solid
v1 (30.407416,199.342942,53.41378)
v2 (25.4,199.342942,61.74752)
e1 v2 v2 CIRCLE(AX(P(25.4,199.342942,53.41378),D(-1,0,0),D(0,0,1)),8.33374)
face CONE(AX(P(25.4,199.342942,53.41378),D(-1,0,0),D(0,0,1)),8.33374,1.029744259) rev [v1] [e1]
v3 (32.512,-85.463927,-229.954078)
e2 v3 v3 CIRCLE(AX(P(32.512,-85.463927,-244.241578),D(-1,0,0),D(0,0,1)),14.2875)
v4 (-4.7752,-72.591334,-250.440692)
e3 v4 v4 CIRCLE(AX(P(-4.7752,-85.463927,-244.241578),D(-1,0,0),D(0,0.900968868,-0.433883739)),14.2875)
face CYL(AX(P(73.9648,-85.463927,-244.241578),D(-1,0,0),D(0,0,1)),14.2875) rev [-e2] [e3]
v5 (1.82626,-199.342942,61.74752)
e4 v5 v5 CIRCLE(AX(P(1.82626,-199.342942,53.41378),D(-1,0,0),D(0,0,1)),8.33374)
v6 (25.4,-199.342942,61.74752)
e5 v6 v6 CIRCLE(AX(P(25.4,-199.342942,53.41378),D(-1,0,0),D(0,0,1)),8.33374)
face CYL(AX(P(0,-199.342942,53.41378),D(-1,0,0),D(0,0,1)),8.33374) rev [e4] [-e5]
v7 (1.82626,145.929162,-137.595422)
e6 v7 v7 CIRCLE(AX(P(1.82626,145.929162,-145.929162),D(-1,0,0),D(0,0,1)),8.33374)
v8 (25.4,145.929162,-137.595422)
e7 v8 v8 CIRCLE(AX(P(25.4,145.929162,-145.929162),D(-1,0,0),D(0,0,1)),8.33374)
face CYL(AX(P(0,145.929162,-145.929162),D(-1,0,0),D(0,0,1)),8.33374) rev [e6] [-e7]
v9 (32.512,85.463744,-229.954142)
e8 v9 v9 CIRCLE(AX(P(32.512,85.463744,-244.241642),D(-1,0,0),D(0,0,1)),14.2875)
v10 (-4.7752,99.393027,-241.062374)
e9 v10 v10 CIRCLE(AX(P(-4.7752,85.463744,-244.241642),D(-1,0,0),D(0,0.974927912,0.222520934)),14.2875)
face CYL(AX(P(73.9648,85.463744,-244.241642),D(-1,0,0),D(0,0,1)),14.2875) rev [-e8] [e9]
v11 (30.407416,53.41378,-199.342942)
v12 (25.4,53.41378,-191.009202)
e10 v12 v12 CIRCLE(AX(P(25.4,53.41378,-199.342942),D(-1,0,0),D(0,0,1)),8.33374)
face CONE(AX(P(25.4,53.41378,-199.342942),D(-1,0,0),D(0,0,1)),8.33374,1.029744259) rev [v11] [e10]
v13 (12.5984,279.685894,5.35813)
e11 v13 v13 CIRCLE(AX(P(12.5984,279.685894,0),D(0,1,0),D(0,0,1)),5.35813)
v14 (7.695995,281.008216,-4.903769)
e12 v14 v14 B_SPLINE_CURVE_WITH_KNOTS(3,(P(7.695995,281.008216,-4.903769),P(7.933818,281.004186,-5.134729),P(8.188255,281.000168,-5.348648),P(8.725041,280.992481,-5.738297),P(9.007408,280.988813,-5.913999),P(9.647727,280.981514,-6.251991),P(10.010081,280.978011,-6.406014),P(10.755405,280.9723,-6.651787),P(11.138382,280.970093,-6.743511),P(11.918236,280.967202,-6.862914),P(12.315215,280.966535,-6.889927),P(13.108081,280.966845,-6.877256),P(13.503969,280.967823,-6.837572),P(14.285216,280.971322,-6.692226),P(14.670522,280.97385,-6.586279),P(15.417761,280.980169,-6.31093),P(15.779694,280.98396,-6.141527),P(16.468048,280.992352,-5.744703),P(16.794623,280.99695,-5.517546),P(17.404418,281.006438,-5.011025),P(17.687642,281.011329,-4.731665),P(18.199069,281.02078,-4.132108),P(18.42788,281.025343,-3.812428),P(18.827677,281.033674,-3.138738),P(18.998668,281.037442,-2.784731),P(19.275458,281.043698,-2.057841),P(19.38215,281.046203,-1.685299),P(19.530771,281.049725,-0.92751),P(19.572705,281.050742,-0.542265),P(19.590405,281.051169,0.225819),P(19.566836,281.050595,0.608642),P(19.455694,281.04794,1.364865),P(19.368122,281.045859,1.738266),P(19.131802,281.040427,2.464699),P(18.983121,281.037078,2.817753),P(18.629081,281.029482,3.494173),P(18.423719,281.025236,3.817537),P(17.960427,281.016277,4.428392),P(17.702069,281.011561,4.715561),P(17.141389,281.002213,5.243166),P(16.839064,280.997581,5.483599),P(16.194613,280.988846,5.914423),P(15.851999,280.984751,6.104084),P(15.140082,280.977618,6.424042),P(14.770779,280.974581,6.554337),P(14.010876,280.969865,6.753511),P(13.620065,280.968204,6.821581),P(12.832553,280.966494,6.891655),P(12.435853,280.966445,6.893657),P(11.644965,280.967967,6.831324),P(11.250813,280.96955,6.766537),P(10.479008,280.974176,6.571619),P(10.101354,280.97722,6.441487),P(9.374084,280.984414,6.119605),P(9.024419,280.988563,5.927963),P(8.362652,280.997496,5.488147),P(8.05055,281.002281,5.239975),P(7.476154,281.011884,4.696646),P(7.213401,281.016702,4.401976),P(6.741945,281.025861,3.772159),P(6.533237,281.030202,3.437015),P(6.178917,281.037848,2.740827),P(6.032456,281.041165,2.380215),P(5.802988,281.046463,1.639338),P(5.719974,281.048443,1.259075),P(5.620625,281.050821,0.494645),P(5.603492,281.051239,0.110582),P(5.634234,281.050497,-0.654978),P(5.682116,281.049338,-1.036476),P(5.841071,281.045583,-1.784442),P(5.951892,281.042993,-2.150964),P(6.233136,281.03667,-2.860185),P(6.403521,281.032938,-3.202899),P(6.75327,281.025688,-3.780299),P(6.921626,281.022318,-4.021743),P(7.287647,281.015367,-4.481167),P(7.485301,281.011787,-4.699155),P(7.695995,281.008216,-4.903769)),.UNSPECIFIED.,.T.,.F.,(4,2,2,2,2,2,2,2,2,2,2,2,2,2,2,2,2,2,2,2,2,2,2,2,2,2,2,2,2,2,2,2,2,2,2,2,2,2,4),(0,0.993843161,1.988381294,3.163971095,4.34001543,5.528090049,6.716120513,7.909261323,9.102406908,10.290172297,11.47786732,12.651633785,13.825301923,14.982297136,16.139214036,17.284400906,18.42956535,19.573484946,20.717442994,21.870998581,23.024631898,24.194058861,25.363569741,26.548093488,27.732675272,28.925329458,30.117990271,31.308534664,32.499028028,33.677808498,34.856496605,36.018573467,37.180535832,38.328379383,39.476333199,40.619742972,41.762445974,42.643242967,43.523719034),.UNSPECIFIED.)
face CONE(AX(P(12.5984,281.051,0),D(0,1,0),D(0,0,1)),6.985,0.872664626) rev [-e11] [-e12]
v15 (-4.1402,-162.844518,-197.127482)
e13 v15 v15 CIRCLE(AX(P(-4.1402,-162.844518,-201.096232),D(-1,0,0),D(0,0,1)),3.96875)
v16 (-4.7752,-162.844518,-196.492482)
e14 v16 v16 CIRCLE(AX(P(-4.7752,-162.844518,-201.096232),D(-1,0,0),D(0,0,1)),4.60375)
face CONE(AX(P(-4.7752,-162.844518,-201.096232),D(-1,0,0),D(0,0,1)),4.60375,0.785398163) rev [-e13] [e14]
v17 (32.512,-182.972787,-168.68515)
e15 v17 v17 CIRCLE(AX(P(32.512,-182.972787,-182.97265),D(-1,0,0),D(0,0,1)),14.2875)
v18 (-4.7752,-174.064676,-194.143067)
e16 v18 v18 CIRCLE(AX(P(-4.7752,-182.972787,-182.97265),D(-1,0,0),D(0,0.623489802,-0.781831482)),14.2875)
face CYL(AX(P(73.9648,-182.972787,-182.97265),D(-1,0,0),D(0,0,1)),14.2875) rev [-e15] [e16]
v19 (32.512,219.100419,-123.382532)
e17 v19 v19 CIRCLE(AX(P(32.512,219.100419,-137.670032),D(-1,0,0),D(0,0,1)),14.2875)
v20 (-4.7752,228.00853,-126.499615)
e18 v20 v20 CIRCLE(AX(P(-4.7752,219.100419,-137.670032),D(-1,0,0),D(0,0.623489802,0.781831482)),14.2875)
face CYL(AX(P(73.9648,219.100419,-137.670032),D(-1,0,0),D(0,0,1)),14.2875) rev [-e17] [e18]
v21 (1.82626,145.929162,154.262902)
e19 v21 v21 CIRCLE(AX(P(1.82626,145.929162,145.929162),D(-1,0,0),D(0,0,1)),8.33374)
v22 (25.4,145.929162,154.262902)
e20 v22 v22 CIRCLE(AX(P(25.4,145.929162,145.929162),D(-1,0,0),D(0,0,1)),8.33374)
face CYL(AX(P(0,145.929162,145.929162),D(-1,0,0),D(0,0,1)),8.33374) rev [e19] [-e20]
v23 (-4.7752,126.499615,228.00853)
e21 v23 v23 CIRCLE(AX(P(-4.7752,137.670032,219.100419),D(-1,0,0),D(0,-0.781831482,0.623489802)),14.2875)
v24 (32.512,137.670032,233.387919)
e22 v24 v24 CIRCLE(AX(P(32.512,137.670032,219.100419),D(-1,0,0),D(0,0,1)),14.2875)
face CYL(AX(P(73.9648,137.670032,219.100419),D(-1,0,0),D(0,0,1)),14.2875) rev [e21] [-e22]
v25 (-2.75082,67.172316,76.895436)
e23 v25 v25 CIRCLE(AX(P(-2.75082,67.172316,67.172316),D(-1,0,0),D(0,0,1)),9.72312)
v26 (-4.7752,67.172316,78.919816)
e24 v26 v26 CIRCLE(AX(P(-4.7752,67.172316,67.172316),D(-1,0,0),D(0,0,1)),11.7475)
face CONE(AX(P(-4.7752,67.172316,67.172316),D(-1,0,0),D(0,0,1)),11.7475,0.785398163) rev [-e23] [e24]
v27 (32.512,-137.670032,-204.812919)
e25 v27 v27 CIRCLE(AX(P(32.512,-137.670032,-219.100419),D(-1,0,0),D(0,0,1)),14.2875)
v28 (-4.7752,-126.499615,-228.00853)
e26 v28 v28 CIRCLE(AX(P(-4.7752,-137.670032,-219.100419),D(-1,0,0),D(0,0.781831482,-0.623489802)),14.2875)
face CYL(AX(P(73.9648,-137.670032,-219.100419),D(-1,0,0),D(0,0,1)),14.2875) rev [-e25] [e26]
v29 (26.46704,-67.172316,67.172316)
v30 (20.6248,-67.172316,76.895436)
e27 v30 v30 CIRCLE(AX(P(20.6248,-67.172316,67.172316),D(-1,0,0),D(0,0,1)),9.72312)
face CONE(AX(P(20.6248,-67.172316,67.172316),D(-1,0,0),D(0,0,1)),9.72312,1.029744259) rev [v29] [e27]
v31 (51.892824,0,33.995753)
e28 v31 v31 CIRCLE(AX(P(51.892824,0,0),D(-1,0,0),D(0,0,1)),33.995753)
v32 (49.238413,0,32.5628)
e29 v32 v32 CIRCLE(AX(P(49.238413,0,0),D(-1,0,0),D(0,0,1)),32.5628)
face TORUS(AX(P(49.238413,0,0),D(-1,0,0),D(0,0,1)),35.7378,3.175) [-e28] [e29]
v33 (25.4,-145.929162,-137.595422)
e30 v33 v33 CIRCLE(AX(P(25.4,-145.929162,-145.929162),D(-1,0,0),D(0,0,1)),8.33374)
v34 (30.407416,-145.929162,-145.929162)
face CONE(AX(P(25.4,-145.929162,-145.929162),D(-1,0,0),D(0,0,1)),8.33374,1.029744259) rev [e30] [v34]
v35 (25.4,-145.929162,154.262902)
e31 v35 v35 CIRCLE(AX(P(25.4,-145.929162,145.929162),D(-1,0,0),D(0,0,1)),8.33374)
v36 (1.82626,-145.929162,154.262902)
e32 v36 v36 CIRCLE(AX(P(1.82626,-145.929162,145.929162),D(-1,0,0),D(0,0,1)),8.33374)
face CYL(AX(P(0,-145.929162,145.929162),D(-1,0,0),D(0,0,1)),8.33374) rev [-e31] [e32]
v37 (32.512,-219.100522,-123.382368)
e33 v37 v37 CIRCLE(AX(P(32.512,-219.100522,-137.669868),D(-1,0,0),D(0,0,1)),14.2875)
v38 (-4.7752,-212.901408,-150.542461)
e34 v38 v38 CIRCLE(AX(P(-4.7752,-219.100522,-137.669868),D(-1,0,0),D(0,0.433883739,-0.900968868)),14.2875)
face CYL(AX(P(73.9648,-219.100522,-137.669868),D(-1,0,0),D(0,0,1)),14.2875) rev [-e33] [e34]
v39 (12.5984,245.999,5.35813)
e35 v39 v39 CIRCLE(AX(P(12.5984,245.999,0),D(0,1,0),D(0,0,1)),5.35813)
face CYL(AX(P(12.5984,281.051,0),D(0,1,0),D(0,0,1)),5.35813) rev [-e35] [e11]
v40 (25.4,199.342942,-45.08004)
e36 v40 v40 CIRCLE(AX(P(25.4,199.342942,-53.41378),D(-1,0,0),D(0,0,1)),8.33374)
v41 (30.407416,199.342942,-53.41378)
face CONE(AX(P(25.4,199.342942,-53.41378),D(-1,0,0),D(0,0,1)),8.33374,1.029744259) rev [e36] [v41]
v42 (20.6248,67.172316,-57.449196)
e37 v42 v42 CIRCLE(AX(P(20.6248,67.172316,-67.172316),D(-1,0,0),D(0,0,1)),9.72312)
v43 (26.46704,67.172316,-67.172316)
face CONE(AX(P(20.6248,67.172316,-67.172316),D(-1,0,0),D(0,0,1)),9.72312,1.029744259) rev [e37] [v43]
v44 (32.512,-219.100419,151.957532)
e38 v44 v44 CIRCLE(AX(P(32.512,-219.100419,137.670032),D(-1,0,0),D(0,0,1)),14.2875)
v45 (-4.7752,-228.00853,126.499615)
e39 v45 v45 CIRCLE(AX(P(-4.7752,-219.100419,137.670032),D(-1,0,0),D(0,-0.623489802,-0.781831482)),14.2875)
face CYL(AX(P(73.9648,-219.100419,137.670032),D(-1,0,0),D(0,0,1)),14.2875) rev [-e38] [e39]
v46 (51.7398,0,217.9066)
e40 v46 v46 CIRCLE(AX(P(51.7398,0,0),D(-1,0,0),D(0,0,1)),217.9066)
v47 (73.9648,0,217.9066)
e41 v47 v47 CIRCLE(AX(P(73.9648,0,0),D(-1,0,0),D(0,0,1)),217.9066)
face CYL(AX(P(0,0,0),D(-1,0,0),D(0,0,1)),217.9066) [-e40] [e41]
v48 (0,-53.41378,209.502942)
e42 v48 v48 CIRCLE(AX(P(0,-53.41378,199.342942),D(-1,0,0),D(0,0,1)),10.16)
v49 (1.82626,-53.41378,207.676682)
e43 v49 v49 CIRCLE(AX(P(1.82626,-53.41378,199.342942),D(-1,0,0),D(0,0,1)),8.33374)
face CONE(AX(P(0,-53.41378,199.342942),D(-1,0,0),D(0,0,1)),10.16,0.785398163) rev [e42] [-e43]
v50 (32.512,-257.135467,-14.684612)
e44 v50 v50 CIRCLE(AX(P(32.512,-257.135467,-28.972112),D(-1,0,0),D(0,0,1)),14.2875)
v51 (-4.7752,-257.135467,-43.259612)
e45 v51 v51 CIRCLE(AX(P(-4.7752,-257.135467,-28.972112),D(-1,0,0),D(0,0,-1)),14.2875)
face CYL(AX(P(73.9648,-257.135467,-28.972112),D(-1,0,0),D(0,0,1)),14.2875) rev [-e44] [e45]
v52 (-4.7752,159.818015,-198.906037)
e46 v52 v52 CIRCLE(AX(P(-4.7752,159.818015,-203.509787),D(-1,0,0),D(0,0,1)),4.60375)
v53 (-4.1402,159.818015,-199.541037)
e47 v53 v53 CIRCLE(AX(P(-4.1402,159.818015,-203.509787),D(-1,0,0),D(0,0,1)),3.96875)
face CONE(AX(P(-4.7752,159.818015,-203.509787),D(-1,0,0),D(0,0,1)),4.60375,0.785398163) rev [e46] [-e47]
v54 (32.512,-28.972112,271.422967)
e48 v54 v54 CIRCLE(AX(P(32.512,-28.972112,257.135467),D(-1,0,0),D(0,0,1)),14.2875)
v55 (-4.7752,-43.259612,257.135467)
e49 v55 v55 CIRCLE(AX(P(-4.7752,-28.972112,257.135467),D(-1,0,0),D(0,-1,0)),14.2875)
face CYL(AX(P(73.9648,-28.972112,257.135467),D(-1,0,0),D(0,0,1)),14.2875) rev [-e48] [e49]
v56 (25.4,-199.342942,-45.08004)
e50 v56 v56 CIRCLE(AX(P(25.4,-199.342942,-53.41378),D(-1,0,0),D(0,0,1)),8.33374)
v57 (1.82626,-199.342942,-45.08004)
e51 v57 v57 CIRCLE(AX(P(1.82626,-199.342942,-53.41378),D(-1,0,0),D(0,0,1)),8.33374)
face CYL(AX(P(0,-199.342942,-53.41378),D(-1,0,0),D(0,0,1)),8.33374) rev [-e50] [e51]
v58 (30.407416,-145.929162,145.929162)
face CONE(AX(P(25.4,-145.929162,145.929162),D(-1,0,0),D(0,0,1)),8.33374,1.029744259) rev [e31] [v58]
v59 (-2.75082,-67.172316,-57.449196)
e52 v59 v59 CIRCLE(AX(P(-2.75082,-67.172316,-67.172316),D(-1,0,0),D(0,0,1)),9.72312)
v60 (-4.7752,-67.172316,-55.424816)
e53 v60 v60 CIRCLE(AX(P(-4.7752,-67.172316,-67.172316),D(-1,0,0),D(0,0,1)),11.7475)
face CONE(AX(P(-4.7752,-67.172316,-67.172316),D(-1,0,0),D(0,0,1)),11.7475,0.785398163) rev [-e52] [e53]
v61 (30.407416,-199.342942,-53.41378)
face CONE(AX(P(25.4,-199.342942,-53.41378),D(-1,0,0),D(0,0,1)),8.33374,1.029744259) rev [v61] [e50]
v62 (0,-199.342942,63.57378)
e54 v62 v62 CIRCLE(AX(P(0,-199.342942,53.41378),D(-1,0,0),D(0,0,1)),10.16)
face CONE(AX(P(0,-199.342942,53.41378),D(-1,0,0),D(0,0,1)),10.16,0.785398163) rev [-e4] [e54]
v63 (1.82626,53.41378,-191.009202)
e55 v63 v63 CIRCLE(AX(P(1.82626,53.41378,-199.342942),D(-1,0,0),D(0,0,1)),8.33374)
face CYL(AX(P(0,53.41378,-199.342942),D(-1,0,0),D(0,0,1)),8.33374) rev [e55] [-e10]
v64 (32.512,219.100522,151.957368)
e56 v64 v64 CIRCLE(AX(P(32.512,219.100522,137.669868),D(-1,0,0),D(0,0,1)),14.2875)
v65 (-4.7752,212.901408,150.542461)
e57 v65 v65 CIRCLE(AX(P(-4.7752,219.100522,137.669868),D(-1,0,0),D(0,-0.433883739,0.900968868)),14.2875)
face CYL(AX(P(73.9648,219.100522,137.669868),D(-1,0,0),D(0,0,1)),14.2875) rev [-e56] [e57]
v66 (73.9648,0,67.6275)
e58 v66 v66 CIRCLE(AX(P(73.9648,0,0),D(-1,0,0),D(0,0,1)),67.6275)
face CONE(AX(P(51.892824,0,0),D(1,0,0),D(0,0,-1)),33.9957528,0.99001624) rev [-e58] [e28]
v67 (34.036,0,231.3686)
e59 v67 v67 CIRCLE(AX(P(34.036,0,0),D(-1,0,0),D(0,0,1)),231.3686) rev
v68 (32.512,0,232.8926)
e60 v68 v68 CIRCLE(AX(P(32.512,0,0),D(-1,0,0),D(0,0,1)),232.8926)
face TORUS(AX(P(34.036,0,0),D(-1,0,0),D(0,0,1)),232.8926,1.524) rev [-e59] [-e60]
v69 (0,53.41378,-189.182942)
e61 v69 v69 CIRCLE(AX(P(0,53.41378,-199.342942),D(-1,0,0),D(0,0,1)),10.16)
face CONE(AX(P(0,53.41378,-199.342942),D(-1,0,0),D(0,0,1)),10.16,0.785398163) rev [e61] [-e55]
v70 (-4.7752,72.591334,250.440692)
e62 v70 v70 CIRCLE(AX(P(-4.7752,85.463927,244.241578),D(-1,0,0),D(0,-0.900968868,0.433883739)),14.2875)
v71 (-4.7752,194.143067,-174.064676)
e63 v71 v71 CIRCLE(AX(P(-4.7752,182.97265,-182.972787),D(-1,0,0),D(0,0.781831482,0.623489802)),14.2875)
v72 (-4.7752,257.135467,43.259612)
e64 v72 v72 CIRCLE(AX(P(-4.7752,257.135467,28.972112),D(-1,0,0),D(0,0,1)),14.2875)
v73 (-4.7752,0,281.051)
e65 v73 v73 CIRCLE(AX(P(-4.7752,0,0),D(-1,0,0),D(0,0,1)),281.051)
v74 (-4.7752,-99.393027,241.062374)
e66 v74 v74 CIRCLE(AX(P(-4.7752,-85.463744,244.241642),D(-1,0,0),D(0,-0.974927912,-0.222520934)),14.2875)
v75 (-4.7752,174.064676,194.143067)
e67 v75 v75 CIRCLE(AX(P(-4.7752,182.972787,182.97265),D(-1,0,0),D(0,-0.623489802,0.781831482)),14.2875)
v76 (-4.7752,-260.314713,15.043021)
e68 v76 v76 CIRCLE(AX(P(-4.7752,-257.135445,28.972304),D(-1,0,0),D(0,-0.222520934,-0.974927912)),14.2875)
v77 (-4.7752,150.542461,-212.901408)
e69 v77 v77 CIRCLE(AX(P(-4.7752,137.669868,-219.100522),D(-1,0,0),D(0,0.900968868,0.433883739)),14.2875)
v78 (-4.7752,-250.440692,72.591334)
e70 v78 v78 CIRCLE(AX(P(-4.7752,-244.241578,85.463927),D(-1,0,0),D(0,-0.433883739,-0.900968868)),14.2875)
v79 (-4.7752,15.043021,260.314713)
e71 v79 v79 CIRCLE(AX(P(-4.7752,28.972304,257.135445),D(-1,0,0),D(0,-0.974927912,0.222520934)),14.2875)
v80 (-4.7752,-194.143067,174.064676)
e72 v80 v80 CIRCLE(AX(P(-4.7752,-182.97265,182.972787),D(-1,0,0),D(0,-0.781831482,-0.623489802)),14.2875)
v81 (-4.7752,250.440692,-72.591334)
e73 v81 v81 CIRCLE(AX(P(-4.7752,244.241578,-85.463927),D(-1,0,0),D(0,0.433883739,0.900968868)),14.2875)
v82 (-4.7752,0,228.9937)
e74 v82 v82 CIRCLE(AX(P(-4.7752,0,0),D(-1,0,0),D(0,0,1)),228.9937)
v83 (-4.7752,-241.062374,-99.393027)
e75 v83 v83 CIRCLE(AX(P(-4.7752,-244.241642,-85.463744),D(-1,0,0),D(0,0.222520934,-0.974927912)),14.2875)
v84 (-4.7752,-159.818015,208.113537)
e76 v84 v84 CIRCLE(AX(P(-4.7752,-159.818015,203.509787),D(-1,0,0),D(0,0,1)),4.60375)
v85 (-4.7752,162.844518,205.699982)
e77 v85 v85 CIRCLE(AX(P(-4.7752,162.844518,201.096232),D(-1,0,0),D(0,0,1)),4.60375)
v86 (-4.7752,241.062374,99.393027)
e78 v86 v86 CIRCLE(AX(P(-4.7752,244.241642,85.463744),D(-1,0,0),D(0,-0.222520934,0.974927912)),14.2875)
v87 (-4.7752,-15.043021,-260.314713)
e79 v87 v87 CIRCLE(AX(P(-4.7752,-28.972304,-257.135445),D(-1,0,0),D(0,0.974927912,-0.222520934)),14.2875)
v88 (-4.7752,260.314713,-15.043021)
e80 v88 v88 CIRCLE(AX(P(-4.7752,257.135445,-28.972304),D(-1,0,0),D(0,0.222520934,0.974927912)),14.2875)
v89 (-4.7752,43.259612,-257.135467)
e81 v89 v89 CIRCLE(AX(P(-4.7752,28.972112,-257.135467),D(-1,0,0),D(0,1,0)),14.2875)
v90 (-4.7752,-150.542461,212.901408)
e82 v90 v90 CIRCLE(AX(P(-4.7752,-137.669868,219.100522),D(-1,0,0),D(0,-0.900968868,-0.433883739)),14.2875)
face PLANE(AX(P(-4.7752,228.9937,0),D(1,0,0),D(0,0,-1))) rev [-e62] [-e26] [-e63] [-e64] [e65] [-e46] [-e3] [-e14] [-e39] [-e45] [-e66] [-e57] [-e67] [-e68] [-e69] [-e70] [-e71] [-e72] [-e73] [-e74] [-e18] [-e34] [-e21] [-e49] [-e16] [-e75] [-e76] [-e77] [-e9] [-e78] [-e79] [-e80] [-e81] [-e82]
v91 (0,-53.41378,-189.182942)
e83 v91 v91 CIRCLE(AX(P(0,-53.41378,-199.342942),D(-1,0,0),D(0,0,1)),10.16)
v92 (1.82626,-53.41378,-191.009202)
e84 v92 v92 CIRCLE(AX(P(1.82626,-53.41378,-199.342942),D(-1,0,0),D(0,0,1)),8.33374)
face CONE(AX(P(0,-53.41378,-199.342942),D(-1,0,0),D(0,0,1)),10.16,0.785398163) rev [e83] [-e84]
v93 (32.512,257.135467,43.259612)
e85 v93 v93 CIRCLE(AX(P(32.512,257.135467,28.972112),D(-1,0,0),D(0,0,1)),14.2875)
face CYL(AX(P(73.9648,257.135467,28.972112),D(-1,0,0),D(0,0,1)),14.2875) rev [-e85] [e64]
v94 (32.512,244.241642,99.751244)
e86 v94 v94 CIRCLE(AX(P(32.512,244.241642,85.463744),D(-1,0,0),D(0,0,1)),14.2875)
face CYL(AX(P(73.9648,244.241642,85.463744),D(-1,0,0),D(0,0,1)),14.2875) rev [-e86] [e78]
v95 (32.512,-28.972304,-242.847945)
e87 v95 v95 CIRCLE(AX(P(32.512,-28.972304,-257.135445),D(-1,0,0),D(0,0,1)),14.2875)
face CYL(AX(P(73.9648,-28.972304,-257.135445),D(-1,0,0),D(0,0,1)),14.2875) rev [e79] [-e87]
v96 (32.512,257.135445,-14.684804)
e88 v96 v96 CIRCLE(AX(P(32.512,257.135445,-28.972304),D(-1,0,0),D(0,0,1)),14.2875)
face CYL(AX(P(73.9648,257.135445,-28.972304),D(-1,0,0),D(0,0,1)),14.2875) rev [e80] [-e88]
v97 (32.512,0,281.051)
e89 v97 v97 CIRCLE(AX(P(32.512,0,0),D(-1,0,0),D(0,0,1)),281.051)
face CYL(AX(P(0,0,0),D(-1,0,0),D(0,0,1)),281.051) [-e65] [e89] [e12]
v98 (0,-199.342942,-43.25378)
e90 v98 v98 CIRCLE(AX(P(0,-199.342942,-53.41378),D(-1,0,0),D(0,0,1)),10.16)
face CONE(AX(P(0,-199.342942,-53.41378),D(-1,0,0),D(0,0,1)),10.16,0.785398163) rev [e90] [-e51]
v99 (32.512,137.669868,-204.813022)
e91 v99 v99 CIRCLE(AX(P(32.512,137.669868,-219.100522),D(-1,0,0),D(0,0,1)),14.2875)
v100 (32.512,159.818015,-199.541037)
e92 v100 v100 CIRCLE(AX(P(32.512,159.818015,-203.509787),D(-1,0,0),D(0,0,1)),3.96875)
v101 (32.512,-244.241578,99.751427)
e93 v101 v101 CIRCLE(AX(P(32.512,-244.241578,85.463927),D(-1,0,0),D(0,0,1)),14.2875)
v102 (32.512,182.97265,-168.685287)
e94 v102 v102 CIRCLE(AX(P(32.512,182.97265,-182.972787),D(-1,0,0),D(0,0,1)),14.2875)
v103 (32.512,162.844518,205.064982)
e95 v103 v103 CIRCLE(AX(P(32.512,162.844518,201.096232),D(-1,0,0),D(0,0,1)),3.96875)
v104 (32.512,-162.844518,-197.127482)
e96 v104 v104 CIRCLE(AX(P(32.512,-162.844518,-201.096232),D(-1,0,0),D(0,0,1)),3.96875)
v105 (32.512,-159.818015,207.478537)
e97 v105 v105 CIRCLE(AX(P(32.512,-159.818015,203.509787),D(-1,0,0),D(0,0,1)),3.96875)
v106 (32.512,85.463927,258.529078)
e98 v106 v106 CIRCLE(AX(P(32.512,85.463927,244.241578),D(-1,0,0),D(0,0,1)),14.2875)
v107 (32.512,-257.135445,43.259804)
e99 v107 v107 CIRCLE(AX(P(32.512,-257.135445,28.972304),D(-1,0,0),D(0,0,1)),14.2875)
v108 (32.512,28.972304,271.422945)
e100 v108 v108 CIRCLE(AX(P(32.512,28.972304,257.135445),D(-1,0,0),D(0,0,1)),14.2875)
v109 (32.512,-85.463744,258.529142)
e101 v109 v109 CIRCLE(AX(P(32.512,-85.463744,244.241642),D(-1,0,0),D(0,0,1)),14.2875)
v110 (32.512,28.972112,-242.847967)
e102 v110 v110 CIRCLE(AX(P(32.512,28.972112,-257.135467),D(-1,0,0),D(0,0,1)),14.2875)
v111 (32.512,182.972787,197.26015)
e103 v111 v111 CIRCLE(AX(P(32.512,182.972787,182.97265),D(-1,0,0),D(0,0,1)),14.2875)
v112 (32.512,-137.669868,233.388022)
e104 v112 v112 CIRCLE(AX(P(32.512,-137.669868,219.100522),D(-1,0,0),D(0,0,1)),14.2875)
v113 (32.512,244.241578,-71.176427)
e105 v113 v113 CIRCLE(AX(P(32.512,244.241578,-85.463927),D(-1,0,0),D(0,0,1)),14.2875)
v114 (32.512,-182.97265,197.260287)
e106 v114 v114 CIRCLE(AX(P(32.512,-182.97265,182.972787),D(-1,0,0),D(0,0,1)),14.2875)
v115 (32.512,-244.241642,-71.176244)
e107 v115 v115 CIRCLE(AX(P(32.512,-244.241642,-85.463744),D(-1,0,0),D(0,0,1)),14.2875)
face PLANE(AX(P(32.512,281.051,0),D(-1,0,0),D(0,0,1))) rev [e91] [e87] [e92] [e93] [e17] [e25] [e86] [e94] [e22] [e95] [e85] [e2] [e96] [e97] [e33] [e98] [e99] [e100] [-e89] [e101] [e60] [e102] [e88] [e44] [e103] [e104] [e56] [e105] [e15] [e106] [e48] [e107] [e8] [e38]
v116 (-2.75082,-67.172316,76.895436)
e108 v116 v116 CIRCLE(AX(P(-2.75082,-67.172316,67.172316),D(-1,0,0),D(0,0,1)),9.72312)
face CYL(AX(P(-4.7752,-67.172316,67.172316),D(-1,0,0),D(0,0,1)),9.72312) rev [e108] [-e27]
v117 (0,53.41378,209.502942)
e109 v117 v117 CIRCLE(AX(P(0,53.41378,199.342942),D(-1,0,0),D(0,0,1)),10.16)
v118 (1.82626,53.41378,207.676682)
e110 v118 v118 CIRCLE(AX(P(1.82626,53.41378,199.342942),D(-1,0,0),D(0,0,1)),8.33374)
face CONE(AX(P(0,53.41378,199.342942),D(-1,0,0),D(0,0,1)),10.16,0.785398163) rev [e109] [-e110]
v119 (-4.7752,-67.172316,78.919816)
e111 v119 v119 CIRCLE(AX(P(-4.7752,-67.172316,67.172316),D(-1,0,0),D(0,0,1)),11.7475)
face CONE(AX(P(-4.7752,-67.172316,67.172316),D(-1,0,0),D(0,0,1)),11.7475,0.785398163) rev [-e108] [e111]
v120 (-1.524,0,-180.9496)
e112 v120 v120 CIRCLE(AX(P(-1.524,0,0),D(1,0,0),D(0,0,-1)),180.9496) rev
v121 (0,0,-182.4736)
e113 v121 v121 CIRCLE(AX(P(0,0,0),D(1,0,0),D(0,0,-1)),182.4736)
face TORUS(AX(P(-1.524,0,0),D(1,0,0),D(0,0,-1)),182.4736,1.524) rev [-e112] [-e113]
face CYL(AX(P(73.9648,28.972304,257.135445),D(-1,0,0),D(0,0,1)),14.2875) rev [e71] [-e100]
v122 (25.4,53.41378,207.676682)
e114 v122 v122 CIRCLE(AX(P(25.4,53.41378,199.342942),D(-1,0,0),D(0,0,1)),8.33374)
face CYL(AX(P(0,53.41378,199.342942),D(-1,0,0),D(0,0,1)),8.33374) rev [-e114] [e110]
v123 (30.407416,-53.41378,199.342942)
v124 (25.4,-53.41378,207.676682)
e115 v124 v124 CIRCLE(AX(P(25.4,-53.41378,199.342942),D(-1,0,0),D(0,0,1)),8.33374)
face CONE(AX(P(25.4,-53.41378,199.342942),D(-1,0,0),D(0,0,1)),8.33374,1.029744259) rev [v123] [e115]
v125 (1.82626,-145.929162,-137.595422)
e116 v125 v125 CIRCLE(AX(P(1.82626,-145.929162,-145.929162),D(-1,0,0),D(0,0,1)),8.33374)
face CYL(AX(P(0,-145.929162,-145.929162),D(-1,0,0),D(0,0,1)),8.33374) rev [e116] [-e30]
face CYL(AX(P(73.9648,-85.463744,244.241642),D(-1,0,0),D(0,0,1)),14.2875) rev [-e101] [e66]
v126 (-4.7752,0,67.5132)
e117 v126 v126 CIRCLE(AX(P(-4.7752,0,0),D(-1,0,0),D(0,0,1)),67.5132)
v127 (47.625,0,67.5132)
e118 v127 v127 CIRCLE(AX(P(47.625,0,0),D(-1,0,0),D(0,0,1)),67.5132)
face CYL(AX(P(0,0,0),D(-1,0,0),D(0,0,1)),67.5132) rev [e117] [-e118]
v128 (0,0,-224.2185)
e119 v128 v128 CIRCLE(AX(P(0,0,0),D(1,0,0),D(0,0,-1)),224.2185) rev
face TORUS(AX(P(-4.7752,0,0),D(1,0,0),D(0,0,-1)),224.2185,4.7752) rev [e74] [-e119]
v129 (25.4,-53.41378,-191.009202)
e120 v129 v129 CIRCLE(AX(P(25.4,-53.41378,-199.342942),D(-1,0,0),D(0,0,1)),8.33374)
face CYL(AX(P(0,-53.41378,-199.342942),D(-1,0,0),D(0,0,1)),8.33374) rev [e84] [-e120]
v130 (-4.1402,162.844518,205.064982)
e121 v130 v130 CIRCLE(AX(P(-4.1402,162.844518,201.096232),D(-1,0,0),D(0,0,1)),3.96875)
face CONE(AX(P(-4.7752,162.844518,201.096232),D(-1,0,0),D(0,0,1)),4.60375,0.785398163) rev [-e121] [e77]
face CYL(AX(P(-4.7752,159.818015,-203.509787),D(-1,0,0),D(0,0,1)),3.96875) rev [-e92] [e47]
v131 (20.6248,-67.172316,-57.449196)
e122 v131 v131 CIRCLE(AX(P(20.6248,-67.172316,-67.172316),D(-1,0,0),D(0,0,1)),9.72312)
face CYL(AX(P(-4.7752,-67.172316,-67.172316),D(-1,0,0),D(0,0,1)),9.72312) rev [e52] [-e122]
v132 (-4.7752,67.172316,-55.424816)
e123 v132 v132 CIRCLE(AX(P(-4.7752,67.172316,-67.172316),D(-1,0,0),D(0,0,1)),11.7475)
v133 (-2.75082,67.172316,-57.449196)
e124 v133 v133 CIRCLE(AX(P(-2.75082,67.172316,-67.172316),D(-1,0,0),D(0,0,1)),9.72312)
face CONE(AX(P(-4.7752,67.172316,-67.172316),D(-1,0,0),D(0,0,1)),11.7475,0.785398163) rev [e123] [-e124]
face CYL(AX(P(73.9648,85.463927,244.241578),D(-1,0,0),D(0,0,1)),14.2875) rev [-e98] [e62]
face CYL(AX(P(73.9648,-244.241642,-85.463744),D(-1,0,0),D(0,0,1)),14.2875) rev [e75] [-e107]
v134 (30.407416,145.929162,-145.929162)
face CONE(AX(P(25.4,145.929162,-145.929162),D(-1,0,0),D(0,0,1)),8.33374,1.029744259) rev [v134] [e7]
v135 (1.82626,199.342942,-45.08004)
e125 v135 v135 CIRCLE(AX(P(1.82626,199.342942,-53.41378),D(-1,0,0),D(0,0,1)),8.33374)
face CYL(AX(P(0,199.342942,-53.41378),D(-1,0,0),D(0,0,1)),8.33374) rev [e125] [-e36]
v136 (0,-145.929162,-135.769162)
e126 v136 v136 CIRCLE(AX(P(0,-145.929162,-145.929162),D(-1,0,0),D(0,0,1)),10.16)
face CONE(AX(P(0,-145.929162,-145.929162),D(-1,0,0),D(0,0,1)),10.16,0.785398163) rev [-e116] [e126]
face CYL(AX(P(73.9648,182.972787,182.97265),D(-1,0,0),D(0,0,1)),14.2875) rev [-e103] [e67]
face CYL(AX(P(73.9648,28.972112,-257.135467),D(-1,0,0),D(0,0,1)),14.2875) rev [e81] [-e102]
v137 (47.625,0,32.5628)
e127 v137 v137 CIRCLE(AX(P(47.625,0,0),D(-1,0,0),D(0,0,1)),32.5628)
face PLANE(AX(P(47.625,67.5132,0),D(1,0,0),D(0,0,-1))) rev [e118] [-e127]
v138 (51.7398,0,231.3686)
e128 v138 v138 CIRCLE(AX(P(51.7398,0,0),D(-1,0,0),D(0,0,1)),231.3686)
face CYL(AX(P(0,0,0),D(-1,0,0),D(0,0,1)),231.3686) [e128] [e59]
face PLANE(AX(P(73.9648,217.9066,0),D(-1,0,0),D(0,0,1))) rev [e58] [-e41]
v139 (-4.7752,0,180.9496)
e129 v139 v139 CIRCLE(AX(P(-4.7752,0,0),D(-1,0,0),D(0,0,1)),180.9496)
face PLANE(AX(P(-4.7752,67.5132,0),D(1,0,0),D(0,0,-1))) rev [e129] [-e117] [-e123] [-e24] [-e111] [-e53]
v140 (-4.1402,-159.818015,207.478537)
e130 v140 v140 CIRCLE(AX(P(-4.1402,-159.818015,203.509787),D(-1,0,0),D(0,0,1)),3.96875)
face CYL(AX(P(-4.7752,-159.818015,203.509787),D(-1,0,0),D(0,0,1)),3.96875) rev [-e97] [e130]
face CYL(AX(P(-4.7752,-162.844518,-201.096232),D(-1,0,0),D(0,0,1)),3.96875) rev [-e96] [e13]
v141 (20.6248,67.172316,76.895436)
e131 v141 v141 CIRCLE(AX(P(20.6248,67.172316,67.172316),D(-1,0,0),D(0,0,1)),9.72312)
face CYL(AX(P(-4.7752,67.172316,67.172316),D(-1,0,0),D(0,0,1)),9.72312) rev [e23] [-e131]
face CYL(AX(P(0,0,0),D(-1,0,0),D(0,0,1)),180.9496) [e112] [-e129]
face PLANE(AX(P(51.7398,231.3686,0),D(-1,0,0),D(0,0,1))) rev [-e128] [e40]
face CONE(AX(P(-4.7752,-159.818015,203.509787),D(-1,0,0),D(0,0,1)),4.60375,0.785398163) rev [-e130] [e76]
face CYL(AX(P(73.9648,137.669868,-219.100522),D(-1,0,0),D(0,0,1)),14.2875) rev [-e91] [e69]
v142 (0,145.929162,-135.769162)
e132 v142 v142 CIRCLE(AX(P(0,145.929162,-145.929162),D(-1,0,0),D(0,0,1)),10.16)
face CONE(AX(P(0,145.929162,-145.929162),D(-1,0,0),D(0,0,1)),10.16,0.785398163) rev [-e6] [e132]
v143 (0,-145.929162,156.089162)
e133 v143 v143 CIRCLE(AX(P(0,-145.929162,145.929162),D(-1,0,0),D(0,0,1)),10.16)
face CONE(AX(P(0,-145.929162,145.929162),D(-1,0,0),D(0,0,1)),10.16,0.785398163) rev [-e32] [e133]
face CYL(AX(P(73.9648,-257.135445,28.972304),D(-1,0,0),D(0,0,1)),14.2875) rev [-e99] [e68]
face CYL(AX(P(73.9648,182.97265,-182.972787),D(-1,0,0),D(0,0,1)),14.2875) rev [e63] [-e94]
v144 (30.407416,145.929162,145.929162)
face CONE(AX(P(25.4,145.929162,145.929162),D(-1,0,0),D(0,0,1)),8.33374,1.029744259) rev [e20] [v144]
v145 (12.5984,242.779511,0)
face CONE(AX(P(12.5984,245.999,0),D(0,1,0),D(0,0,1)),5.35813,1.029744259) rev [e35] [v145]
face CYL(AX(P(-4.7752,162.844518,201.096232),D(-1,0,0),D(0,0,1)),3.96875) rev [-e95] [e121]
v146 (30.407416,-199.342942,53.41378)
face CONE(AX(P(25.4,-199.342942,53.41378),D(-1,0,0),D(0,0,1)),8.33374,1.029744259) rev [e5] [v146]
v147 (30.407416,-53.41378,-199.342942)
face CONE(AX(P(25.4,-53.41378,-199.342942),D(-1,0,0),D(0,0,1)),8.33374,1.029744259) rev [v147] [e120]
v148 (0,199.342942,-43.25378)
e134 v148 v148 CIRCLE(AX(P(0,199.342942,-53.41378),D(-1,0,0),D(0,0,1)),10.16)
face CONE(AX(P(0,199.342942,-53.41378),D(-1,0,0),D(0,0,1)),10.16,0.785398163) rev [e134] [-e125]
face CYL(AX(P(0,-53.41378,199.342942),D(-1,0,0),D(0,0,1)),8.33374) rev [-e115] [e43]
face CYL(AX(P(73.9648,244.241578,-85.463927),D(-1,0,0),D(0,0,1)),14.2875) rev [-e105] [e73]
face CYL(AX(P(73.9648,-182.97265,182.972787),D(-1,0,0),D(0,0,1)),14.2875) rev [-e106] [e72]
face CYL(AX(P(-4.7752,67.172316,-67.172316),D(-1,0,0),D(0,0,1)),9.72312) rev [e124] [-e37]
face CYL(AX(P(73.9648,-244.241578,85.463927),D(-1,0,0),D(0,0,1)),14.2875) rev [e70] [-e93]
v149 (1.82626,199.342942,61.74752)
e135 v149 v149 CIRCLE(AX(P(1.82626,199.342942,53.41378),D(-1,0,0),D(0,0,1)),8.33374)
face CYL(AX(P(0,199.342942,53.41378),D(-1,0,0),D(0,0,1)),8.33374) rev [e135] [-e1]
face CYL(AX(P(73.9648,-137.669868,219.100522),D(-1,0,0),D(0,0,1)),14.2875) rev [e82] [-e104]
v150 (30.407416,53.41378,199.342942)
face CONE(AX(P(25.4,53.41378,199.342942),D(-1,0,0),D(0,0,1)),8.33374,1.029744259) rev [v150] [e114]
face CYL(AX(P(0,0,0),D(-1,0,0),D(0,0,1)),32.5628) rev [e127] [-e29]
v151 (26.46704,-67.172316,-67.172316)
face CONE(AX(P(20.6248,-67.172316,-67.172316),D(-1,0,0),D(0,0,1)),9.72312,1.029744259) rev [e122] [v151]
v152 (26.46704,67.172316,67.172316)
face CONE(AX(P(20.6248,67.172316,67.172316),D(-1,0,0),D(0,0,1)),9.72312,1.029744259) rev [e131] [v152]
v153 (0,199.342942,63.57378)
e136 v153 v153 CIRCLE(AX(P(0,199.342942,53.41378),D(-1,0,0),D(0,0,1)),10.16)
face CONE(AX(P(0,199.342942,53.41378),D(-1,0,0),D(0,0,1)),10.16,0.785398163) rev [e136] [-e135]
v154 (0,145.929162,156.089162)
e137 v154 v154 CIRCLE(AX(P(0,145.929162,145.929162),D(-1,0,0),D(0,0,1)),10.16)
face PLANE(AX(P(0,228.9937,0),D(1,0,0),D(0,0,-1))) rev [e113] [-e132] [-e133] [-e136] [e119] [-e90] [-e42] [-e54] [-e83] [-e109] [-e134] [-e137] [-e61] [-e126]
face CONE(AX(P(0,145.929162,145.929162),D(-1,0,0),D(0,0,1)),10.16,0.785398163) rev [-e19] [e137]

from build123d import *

# Parameters (mm, degrees)
SKETCH4_R                         = 14.2875
CUT_EXTRUDE1_DEPTH                = 406.190469782
CIRPATTERN2_COUNT                 = 28
CIRPATTERN3_COUNT                 = 12
CIRPATTERN4_COUNT                 = 4
CIRPATTERN5_COUNT                 = 56
F_1_2_13_TAPPED_HOLE4_D           = 10.71626
F_1_2_13_TAPPED_HOLE4_DEPTH       = 35.052
F_1_2_13_TAPPED_HOLE4_CSINK_D     = 13.97
F_1_2_13_TAPPED_HOLE4_CSINK_ANGLE = 100
F_1_2_13_TAPPED_HOLE4_TIP         = 3.219489309
FILLET1_R                         = 1.524
FILLET2_R                         = 4.7752
FILLET3_R                         = 1.524


with BuildPart() as part:
    # Sketch1 → Revolve1 (revolve)
    with BuildSketch(Plane.XY, mode=Mode.PRIVATE) as revolve1_sk:
        with BuildLine():
            Line((-4.7752, 67.5132), (-4.7752, 180.9496))
            Line((-4.7752, 180.9496), (0, 180.9496))
            Line((0, 180.9496), (0, 228.9937))
            Line((0, 228.9937), (-4.7752, 228.9937))
            Line((-4.7752, 228.9937), (-4.7752, 281.051))
            Line((-4.7752, 281.051), (32.512, 281.051))
            Line((32.512, 281.051), (32.512, 231.3686))
            Line((32.512, 231.3686), (51.7398, 231.3686))
            Line((51.7398, 231.3686), (51.7398, 217.9066))
            Line((51.7398, 217.9066), (73.9648, 217.9066))
            Line((73.9648, 217.9066), (73.9648, 67.6275))
            Line((73.9648, 67.6275), (51.892823931, 33.9957528))
            ThreePointArc((51.892823931, 33.9957528), (50.746661337, 32.943911593), (49.238413158, 32.5628))
            Line((49.238413158, 32.5628), (47.625, 32.5628))
            Line((47.625, 32.5628), (47.625, 67.5132))
            Line((47.625, 67.5132), (-4.7752, 67.5132))
        make_face()
    revolve(revolve1_sk.sketch.rotate(Axis((0, 0, 0), (1, 0, 0)), 90), axis=Axis((0, 0, 0), (1, 0, 0)))

    # Sketch4 → Cut-Extrude1 (cut, through all)
    with BuildSketch(Plane.ZY.offset(4.7752)):
        with Locations((28.972111579, 257.135466548)):
            Circle(SKETCH4_R)
    cut_extrude1 = extrude(amount=-CUT_EXTRUDE1_DEPTH, mode=Mode.SUBTRACT)

    # CirPattern2: Cut-Extrude1 ×28 about axis
    cirpattern2_axis = Axis((0, 0, 0), (1, 0, 0))
    for i in range(1, CIRPATTERN2_COUNT):
        add(cut_extrude1.rotate(cirpattern2_axis, i * 360 / CIRPATTERN2_COUNT), mode=Mode.SUBTRACT)

    # Sketch8 → 3/4-10 Tapped Hole1 (revolve, cut)
    with BuildSketch(Plane(origin=(0, 199.3429424, 53.413780433), x_dir=(0, 0, 1), z_dir=(0, 1, 0))):
        Polygon((0, 0), (0, 30.407416175), (8.33374, 25.4), (8.33374, 1.82626), (10.16, 0), align=None)
    f_3_4_10_tapped_hole1 = revolve(axis=Axis((-6.35, 199.3429424, 53.413780433), (1, 0, 0)), mode=Mode.SUBTRACT)

    # CirPattern3: 3/4-10 Tapped Hole1 ×12 about axis
    cirpattern3_axis = Axis((0, 0, 0), (1, 0, 0))
    for i in range(1, CIRPATTERN3_COUNT):
        add(f_3_4_10_tapped_hole1.rotate(cirpattern3_axis, i * 360 / CIRPATTERN3_COUNT), mode=Mode.SUBTRACT)

    # Sketch10 → 7/8-9 Tapped Hole1 (revolve, cut)
    with BuildSketch(Plane(origin=(-4.7752, 67.172315786, 67.172315786), x_dir=(0, 0, 1), z_dir=(0, 1, 0))):
        Polygon((0, 0), (0, 31.242239902), (9.72312, 25.4), (9.72312, 2.02438), (11.7475, 0), align=None)
    f_7_8_9_tapped_hole1 = revolve(axis=Axis((-11.1252, 67.172315786, 67.172315786), (1, 0, 0)), mode=Mode.SUBTRACT)

    # CirPattern4: 7/8-9 Tapped Hole1 ×4 about axis
    cirpattern4_axis = Axis((0, 0, 0), (1, 0, 0))
    for i in range(1, CIRPATTERN4_COUNT):
        add(f_7_8_9_tapped_hole1.rotate(cirpattern4_axis, i * 360 / CIRPATTERN4_COUNT), mode=Mode.SUBTRACT)

    # Sketch21 → Tap Drill for 3/8-16 Tap1 (revolve, cut)
    with BuildSketch(Plane(origin=(-4.7752, 162.844517689, 201.096231852), x_dir=(0, 0, 1), z_dir=(0, 1, 0))):
        Polygon((0, 0), (0, 43.024665582), (3.96875, 40.64), (3.96875, 0.635), (4.60375, 0), align=None)
    tap_drill_for_3_8_16_tap1 = revolve(axis=Axis((-11.1252, 162.844517689, 201.096231852), (1, 0, 0)), mode=Mode.SUBTRACT)

    # CirPattern5: Tap Drill for 3/8-16 Tap1 ×56 about axis, 52 skipped
    cirpattern5_axis = Axis((0, 0, 0), (-1, 0, 0))
    add([tap_drill_for_3_8_16_tap1.rotate(cirpattern5_axis, i * 360 / CIRPATTERN5_COUNT) for i in range(1, CIRPATTERN5_COUNT) if i not in (1, 2, 3, 4, 5, 6, 7, 8, 9, 10, 11, 12, 13, 14, 15, 17, 18, 19, 20, 21, 22, 23, 24, 25, 26, 27, 29, 30, 31, 32, 33, 34, 35, 36, 37, 38, 39, 40, 41, 42, 43, 45, 46, 47, 48, 49, 50, 51, 52, 53, 54, 55)], mode=Mode.SUBTRACT)

    # 1/2-13 Tapped Hole4
    with Locations(Plane(origin=(12.5984, 281.051, 0), x_dir=(0, 0, 1), z_dir=(0, 1, 0))):
        with Locations((0, 0)):
            CounterSinkHole(F_1_2_13_TAPPED_HOLE4_D / 2, F_1_2_13_TAPPED_HOLE4_CSINK_D / 2, depth=F_1_2_13_TAPPED_HOLE4_DEPTH, counter_sink_angle=F_1_2_13_TAPPED_HOLE4_CSINK_ANGLE)
            with Locations((0, 0, -(F_1_2_13_TAPPED_HOLE4_DEPTH + F_1_2_13_TAPPED_HOLE4_TIP / 2))):  # 118° drill point
                Cone(0, F_1_2_13_TAPPED_HOLE4_D / 2, F_1_2_13_TAPPED_HOLE4_TIP, mode=Mode.SUBTRACT)

    # Fillet1
    fillet1_edges = [part.edges().sort_by_distance(p)[0] for p in [
        (32.512, 0, -231.3686),
    ]]
    fillet(fillet1_edges, radius=FILLET1_R)

    # Fillet2
    fillet2_edges = [part.edges().sort_by_distance(p)[0] for p in [
        (0, 0, -228.9937),
    ]]
    fillet(fillet2_edges, radius=FILLET2_R - 0.0001)  # a hair under: the kernel refuses the full size

    # Fillet3
    fillet3_edges = [part.edges().sort_by_distance(p)[0] for p in [
        (0, 0, -180.9496),
    ]]
    fillet(fillet3_edges, radius=FILLET3_R)


solid = part.part
